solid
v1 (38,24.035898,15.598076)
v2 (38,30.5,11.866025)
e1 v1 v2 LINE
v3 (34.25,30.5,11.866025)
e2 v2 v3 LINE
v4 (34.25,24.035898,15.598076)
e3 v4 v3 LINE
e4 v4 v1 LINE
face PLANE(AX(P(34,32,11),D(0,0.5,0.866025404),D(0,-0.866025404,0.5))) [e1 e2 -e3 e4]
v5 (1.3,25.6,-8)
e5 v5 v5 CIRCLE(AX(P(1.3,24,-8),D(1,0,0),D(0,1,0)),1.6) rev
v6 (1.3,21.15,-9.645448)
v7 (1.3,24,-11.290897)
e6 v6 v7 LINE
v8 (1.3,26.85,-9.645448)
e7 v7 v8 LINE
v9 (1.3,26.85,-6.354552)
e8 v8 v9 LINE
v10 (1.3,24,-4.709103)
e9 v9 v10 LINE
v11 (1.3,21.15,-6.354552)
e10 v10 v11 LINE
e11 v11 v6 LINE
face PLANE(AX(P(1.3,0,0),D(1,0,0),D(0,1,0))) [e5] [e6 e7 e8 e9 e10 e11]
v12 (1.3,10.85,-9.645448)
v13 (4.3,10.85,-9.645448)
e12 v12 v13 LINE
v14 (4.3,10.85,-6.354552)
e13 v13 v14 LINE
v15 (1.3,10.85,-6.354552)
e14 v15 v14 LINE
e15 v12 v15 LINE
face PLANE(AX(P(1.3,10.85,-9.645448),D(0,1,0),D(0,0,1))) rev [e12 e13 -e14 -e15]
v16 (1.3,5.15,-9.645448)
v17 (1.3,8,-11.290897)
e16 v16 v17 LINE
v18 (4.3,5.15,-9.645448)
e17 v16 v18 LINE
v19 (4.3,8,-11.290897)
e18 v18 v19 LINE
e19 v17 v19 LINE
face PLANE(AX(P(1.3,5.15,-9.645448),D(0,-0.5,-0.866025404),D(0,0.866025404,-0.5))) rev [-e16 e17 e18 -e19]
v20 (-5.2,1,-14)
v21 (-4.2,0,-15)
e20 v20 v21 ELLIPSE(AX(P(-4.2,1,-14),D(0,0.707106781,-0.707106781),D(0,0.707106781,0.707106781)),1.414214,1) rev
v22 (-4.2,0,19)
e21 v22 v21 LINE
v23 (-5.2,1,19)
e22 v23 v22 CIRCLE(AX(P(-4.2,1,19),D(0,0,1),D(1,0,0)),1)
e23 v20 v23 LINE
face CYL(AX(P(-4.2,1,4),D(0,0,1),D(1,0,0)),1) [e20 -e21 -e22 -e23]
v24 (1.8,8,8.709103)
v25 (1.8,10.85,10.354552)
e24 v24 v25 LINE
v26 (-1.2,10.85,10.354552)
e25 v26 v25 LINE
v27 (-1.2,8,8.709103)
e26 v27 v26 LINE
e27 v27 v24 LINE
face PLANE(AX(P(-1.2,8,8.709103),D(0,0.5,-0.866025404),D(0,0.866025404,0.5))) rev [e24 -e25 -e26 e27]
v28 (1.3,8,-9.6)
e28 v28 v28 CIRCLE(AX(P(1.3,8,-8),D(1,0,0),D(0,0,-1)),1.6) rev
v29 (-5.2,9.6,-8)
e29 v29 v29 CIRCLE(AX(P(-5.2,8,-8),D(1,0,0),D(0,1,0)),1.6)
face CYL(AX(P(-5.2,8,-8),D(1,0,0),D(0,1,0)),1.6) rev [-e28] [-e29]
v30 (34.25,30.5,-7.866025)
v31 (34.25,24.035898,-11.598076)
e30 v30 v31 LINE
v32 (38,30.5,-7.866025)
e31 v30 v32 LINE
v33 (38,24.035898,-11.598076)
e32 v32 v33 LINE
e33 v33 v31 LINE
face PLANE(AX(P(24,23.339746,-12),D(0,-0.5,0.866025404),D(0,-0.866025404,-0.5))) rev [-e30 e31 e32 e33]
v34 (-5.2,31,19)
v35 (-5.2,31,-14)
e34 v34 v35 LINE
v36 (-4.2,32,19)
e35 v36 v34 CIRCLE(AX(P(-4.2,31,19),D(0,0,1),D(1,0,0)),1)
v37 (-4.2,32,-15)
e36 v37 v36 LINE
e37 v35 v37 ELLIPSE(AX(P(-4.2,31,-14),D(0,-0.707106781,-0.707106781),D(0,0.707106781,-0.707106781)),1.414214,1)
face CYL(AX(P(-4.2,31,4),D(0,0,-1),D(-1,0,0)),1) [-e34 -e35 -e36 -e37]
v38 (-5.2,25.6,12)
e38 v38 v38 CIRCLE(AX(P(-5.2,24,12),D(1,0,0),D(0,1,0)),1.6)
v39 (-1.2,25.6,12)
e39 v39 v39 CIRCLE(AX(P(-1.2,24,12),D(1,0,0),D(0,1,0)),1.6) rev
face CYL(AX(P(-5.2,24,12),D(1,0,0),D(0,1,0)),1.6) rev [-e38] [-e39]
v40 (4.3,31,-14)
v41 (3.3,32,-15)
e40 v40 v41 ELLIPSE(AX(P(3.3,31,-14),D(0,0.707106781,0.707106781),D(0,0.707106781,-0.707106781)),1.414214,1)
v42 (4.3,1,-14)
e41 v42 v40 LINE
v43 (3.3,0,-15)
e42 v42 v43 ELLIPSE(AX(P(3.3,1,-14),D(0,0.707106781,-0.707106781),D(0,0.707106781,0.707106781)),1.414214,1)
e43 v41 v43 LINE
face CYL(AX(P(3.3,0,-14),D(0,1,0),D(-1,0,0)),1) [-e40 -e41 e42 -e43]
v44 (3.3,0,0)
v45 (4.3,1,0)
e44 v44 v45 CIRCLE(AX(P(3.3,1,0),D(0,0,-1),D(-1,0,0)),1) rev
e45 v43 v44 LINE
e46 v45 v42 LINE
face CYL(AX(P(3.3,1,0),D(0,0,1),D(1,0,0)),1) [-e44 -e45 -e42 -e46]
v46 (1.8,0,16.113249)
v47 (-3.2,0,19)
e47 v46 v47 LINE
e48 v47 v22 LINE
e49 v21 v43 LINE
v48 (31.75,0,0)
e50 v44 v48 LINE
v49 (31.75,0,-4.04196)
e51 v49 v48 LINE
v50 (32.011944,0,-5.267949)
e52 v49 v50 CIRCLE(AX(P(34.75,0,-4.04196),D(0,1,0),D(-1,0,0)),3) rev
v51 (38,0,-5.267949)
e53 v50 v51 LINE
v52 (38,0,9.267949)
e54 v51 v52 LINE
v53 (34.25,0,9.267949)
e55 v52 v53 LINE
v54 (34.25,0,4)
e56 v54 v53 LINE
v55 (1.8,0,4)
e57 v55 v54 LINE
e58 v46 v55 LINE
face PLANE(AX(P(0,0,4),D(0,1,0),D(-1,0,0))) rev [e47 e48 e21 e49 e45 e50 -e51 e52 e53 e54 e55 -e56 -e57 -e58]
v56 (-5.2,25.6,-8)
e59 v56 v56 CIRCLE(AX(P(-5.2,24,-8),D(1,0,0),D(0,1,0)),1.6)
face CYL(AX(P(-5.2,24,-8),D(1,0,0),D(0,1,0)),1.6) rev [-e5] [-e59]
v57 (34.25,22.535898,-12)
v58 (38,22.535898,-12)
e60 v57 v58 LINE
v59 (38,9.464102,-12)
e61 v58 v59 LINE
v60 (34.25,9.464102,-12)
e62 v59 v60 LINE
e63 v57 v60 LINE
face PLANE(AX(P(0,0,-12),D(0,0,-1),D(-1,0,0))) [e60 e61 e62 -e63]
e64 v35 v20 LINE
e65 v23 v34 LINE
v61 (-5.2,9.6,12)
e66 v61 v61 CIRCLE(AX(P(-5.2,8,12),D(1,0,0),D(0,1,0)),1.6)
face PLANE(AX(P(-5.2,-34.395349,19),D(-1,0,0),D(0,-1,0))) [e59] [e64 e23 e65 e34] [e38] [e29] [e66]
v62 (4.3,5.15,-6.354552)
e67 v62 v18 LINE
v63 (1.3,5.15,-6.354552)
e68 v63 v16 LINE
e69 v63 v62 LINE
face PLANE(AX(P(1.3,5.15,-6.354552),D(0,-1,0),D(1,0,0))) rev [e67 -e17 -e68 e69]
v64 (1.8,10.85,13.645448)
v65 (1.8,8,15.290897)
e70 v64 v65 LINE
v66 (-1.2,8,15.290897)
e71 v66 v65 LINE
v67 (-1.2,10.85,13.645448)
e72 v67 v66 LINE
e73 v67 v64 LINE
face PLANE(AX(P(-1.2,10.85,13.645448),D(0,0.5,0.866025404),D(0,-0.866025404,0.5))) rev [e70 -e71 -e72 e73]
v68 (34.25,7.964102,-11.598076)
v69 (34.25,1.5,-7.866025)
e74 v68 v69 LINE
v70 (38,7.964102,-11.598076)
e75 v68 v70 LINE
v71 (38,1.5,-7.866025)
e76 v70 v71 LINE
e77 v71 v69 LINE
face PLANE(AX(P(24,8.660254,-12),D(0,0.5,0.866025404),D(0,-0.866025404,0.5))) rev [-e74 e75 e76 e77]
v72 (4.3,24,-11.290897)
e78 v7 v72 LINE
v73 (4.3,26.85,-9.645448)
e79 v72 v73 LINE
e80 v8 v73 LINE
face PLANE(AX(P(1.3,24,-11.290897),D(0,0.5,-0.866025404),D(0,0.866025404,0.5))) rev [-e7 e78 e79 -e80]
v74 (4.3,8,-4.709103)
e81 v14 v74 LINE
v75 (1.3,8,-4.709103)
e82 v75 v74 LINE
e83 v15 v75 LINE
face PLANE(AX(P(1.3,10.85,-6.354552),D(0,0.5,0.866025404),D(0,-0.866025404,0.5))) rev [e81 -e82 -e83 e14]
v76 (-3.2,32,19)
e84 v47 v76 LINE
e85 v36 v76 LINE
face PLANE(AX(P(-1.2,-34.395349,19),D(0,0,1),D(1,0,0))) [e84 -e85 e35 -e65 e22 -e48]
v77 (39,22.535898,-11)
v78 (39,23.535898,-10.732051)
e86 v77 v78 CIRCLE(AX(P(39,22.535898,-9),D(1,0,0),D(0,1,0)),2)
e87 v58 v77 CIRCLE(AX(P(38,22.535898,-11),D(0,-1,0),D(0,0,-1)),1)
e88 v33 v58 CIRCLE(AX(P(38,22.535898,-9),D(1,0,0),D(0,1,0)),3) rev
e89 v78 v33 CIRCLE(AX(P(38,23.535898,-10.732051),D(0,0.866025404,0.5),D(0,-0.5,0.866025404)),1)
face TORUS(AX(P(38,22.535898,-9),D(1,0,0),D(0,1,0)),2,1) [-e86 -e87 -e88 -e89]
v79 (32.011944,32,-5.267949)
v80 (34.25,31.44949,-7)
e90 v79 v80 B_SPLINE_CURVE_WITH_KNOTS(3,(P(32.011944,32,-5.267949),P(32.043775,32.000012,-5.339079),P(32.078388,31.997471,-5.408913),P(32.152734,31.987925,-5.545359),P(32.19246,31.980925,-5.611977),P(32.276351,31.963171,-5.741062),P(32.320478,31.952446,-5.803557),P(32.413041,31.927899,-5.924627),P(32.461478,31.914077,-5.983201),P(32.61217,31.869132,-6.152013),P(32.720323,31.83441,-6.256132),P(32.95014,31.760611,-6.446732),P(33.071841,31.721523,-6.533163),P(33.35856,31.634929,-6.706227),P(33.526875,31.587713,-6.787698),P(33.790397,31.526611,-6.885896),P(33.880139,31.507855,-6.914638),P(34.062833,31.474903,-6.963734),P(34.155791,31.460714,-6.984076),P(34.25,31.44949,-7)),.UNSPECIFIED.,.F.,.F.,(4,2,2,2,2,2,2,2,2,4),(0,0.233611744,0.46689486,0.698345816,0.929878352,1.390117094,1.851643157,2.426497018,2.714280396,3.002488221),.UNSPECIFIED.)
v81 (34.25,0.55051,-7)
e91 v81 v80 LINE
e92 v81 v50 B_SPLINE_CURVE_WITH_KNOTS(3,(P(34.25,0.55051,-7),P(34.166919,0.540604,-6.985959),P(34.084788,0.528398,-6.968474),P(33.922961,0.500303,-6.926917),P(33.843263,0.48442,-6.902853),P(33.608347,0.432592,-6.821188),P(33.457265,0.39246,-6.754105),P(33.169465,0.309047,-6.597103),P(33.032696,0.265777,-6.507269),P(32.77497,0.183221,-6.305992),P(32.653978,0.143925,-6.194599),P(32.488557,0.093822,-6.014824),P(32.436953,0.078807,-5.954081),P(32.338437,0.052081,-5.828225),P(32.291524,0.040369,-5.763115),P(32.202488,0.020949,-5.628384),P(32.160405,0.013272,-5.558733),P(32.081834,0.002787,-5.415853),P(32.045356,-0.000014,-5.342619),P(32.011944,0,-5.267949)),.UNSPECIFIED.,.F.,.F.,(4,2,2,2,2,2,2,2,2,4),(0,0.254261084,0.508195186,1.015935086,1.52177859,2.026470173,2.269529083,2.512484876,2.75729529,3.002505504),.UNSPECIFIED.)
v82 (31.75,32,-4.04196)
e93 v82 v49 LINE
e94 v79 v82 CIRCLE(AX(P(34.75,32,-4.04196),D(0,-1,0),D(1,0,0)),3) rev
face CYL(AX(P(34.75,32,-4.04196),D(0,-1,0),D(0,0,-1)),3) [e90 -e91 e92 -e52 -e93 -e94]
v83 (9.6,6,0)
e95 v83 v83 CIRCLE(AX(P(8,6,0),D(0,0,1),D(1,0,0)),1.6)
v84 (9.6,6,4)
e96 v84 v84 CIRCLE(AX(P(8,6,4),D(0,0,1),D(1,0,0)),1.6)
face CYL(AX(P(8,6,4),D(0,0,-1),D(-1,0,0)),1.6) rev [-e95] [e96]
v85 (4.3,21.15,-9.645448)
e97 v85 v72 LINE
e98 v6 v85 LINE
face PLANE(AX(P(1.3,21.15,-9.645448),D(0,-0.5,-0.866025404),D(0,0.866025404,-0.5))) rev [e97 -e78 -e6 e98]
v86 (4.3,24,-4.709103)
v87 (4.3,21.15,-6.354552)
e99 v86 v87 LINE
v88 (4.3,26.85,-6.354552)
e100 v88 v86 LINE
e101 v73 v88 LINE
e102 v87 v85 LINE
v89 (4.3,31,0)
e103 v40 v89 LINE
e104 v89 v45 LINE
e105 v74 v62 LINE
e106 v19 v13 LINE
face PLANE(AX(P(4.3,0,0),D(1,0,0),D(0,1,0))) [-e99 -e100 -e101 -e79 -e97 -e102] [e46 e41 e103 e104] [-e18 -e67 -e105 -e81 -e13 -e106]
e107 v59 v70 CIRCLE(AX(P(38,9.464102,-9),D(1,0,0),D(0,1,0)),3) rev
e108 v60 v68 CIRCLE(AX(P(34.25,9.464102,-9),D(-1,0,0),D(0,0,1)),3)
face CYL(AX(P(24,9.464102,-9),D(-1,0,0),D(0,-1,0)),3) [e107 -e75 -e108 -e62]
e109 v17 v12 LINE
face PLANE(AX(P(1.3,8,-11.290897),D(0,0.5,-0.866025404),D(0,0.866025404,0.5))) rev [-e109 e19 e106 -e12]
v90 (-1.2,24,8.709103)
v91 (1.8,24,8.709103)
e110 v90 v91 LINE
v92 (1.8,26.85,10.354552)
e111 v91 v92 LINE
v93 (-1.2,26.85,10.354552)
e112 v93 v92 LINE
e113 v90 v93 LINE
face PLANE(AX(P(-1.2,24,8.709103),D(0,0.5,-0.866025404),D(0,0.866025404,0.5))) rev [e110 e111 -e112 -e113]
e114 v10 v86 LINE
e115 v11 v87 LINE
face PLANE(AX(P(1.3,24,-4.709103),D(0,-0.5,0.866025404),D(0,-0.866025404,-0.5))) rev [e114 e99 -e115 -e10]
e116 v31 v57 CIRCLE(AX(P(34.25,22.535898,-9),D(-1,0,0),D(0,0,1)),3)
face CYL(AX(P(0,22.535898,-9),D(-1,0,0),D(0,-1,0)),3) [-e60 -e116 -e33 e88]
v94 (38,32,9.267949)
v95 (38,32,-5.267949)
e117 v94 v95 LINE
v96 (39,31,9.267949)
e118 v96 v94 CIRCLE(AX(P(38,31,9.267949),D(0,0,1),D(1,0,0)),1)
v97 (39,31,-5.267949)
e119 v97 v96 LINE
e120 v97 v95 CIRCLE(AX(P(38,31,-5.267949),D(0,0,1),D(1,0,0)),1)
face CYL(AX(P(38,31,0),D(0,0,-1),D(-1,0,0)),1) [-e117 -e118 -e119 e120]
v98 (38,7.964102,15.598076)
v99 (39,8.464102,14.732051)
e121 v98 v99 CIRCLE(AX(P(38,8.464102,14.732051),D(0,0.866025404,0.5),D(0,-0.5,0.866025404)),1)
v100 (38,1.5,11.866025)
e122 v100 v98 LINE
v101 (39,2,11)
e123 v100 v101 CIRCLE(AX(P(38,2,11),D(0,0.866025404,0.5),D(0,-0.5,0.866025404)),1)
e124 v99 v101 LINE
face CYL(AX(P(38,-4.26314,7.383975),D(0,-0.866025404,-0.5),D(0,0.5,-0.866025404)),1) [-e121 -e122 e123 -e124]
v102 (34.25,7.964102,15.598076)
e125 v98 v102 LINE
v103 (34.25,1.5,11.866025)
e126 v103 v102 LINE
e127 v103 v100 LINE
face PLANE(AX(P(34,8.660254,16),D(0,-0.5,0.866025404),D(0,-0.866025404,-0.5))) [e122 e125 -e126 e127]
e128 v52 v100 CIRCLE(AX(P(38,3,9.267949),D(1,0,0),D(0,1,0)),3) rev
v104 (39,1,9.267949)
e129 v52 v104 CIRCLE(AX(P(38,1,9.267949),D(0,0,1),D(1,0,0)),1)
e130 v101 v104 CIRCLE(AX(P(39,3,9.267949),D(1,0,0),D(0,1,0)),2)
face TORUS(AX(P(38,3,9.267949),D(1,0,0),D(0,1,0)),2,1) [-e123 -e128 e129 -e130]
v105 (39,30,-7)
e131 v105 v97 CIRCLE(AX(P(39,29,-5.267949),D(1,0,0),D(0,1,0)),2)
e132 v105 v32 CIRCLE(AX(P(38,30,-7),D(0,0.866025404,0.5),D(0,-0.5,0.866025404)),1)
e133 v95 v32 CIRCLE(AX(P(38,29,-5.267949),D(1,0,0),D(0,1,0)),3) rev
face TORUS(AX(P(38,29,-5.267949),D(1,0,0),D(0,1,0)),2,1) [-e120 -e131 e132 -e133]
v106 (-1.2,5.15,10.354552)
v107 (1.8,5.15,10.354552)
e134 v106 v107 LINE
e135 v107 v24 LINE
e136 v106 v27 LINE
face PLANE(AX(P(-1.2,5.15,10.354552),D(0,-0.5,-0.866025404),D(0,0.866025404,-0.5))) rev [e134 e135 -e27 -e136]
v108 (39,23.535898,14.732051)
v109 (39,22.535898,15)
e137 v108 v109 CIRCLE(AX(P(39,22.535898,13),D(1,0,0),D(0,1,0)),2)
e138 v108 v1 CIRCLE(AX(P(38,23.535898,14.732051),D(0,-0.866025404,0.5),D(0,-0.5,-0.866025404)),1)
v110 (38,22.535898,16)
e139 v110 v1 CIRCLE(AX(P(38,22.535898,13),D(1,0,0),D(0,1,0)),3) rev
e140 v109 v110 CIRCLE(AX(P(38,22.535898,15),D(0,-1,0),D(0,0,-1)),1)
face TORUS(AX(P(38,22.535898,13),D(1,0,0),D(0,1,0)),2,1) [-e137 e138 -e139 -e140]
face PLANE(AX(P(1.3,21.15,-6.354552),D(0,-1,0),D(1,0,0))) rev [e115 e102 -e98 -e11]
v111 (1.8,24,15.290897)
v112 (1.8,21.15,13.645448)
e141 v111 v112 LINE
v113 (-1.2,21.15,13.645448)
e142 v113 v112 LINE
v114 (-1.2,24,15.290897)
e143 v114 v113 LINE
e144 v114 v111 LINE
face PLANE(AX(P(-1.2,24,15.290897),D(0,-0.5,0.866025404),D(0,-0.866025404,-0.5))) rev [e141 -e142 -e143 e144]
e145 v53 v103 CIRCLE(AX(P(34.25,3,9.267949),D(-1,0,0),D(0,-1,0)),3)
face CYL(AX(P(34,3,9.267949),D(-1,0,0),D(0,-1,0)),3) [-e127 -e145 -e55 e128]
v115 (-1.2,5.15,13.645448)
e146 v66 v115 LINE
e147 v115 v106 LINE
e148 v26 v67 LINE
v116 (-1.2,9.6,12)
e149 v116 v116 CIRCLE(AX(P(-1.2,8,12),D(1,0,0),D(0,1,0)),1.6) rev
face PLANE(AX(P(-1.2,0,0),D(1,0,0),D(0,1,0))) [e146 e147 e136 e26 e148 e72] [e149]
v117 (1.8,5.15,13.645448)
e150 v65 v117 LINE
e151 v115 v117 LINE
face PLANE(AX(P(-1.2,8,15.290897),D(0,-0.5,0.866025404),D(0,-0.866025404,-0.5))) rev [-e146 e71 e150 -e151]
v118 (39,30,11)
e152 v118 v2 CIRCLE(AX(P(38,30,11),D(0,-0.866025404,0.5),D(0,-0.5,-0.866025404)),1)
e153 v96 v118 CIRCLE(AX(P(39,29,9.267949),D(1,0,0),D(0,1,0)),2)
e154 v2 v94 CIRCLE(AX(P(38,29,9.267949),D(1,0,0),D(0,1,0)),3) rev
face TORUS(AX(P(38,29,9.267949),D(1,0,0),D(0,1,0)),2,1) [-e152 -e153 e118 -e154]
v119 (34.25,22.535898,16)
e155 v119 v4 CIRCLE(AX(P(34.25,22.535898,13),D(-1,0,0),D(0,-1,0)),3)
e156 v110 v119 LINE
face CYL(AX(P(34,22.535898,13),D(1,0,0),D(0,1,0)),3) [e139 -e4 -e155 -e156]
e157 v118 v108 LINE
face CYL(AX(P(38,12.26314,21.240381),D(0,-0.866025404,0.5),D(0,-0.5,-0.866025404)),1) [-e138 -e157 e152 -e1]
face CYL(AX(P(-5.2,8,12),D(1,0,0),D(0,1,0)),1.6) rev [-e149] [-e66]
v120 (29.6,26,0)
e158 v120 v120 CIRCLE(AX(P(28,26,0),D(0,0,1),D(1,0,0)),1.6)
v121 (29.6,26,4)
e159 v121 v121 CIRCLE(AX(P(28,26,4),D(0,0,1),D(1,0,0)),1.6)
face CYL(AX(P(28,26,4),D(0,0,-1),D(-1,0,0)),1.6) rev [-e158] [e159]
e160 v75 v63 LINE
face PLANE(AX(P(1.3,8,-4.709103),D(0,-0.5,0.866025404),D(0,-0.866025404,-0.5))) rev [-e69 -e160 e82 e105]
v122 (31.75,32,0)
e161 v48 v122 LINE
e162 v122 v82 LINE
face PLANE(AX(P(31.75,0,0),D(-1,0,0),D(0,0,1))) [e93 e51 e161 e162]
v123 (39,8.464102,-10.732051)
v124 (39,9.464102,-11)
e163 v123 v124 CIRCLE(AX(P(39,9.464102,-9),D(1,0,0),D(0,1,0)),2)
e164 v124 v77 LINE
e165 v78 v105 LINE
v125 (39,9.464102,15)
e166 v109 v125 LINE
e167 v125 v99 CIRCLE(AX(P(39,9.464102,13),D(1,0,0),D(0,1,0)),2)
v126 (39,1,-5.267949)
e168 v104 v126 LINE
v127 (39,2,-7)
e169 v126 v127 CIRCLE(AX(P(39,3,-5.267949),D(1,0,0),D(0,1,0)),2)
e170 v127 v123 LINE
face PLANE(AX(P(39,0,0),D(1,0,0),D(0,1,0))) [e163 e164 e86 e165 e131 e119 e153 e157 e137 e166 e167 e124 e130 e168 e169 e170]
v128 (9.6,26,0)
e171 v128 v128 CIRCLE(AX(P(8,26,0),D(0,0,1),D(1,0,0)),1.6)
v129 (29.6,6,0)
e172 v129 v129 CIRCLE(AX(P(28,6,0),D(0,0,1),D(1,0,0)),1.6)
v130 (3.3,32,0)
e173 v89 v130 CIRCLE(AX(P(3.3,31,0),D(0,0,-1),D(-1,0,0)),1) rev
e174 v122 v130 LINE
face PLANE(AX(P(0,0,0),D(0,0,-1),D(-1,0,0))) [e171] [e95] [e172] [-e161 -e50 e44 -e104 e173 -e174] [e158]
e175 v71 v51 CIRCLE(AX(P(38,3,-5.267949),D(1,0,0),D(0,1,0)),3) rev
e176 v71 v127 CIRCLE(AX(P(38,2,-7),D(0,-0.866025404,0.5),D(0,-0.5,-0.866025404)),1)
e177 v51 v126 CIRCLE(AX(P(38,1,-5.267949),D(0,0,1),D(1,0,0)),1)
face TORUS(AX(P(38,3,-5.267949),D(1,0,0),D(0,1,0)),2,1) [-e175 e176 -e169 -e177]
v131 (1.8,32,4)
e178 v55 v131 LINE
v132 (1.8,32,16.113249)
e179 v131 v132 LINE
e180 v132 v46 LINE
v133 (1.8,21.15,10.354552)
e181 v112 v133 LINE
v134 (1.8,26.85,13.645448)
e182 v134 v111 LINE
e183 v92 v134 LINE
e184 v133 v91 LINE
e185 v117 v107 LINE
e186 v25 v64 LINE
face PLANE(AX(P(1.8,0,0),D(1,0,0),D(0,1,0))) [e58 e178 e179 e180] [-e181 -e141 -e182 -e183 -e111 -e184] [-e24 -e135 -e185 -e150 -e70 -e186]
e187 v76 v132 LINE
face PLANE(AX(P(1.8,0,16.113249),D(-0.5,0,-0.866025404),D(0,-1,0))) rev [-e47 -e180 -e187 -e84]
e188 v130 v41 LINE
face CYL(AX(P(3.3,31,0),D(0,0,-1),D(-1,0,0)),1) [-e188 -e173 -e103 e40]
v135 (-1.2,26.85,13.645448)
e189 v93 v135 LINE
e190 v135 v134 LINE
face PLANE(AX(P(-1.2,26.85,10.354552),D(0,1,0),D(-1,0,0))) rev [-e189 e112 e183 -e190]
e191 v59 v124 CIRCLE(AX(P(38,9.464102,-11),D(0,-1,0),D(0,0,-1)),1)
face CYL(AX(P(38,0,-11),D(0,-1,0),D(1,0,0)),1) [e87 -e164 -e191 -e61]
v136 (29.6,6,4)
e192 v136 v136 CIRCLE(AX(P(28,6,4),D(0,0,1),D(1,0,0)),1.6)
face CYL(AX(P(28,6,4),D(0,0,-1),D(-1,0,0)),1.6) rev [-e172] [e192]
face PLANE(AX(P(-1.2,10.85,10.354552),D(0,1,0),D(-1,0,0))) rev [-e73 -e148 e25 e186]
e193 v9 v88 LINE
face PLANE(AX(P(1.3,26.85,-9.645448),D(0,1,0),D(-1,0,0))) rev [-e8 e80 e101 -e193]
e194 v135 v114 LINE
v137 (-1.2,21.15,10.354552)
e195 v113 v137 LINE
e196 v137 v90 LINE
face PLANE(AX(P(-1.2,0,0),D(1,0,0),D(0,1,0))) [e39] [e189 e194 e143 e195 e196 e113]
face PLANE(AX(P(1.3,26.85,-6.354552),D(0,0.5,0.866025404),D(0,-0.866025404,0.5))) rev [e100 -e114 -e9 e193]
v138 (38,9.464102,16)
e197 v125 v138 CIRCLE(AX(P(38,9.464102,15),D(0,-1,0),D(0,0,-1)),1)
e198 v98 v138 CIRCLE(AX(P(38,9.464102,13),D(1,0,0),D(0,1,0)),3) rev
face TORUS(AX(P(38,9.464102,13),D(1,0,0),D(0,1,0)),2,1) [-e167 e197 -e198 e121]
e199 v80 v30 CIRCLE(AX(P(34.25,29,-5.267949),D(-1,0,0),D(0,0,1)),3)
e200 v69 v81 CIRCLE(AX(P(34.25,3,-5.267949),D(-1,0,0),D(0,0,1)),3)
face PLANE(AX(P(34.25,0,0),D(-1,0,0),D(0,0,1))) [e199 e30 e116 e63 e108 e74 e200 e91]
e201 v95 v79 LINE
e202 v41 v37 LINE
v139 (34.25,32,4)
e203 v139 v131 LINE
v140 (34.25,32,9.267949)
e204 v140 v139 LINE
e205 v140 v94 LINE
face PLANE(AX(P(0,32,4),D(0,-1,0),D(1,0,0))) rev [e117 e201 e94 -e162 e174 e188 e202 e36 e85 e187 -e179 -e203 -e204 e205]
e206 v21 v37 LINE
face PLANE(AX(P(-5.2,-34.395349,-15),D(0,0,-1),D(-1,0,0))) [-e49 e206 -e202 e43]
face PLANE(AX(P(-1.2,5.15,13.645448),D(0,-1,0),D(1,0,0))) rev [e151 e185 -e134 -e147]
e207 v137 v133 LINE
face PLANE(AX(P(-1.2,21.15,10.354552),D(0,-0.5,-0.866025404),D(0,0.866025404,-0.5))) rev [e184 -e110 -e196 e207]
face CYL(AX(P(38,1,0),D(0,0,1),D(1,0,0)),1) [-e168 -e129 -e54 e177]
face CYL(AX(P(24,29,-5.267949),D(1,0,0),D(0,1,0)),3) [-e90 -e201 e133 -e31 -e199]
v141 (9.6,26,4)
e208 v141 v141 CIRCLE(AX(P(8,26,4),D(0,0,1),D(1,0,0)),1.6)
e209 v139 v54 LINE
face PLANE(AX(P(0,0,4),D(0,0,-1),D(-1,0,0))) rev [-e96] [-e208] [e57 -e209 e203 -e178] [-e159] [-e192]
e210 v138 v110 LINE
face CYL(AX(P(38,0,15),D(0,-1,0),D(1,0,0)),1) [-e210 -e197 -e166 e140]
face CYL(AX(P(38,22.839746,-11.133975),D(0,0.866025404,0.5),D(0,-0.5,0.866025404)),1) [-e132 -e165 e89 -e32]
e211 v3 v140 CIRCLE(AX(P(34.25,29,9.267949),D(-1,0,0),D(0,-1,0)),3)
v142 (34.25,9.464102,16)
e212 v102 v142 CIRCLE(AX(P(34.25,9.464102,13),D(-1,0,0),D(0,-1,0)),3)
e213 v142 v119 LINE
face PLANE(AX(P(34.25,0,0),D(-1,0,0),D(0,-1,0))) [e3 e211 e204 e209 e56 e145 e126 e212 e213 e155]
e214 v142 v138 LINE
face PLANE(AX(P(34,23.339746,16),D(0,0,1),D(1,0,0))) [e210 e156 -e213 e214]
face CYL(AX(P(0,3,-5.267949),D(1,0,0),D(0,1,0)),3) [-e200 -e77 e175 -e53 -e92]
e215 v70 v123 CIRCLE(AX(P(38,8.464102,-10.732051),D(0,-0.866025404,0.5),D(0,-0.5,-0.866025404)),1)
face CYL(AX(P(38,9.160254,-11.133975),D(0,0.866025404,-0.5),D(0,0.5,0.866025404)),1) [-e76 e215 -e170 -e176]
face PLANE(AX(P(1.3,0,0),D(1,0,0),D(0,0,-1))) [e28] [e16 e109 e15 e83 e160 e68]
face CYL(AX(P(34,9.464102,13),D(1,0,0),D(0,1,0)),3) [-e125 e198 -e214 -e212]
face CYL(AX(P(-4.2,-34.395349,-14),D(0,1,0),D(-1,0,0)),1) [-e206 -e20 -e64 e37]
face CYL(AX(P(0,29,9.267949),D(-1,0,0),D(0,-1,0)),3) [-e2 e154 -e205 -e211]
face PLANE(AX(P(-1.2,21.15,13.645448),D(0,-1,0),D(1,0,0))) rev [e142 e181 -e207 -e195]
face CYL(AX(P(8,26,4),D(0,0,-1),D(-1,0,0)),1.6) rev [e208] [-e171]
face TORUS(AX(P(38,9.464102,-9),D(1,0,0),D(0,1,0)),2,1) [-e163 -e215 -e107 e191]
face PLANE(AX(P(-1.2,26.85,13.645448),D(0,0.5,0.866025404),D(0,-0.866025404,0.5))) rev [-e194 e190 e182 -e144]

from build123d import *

# Parameters (mm, degrees)
SKETCH_1_W          = 36
SKETCH_1_H          = 32
SKETCH_1_R          = 1.6
EXTRUDE_1_DEPTH     = 4
EXTRUDE_2_DEPTH     = 32
SKETCH_8_R          = 1.6
CUT_EXTRUDE_1_DEPTH = 53.619768148
SKETCH1_W           = 4
SKETCH1_H           = 32
BOSS_EXTRUDE1_DEPTH = 3
SKETCH2_W           = 5
SKETCH2_H           = 32
BOSS_EXTRUDE2_DEPTH = 12
CUT_EXTRUDE1_DEPTH  = 5
BOSS_EXTRUDE5_DEPTH = 5
BOSS_EXTRUDE6_START = 3
SKETCH7_W           = 15
SKETCH7_H           = 32
SKETCH7_R           = 1.6
BOSS_EXTRUDE6_DEPTH = 3
CUT_EXTRUDE2_DEPTH  = 0.25
BOSS_EXTRUDE7_START = 2.5
SKETCH9_W           = 15
SKETCH9_H           = 32
SKETCH9_R           = 1.6
BOSS_EXTRUDE7_DEPTH = 2.5
BOSS_EXTRUDE8_DEPTH = 2.5
CUT_EXTRUDE3_DEPTH  = 2.5
FILLET2_R           = 3
FILLET4_R           = 3
FILLET5_R           = 3
FILLET9_R           = 1
CUT_EXTRUDE4_DEPTH  = 3
CUT_EXTRUDE5_DEPTH  = 3
FILLET14_R          = 1
CHAMFER_1_SIZE      = 5
CHAMFER_1_SIZE2     = 2.886751346


with BuildPart() as part:
    # Эскиз1 → Бобышка-Вытянуть1 (new body)
    with BuildSketch(Plane.XY):
        with Locations((18, 16)):
            Rectangle(SKETCH_1_W, SKETCH_1_H)
        with Locations((8, 26)):
            Circle(SKETCH_1_R, mode=Mode.SUBTRACT)
        with Locations((28, 26)):
            Circle(SKETCH_1_R, mode=Mode.SUBTRACT)
        with Locations((8, 6)):
            Circle(SKETCH_1_R, mode=Mode.SUBTRACT)
        with Locations((28, 6)):
            Circle(SKETCH_1_R, mode=Mode.SUBTRACT)
    extrude(amount=EXTRUDE_1_DEPTH)

    # Эскиз7 → Бобышка-Вытянуть2 (add)
    with BuildSketch(Plane(origin=(0, 32, 0), x_dir=(1, 0, 0), z_dir=(0, 1, 0))):
        Polygon((0, 0), (-1.2, 0), (-1.2, 15), (-5.2, 15), (-5.2, -19), (-1.2, -19), (-1.2, -4), (0, -4), align=None)
    extrude(amount=-EXTRUDE_2_DEPTH)

    # Эскиз8 → Вырез-Вытянуть1 (cut, through all)
    with BuildSketch(Plane(origin=(-1.2, 0, 0), x_dir=(0, 0, -1), z_dir=(1, 0, 0))):
        with Locations(Location((8, 24, 0), (0, 0, 90))):
            Circle(SKETCH_8_R)
        with Locations(Location((8, 8, 0), (0, 0, 90))):
            Circle(SKETCH_8_R)
        with Locations(Location((-12, 8, 0), (0, 0, 90))):
            Circle(SKETCH_8_R)
        with Locations(Location((-12, 24, 0), (0, 0, 90))):
            Circle(SKETCH_8_R)
    extrude(amount=-CUT_EXTRUDE_1_DEPTH, mode=Mode.SUBTRACT)

    # Sketch1 → Boss-Extrude1 (add)
    with BuildSketch(Plane(origin=(36, 0, 0), x_dir=(0, 0, -1), z_dir=(1, 0, 0))):
        with Locations((-2, 16)):
            Rectangle(SKETCH1_W, SKETCH1_H)
    extrude(amount=BOSS_EXTRUDE1_DEPTH)

    # Sketch2 → Boss-Extrude2 (add)
    with BuildSketch(Plane(origin=(0, 0, 0), x_dir=(-1, 0, 0), z_dir=(0, 0, -1))):
        with Locations((-36.5, 16)):
            Rectangle(SKETCH2_W, SKETCH2_H)
    extrude(amount=BOSS_EXTRUDE2_DEPTH)

    # Sketch3 → Cut-Extrude1 (cut)
    with BuildSketch(Plane(origin=(39, 0, 0), x_dir=(0, 0, -1), z_dir=(1, 0, 0))):
        Polygon((7, 32), (12, 32), (12, 23.339745962), align=None)
        Polygon((12, 8.660254038), (7, 0), (12, 0), align=None)
    extrude(amount=-CUT_EXTRUDE1_DEPTH, mode=Mode.SUBTRACT)

    # Sketch6 → Boss-Extrude5 (add)
    with BuildSketch(Plane(origin=(39, 0, 0), x_dir=(0, 0, -1), z_dir=(1, 0, 0))):
        Polygon((-16, 8.660254038), (-11, 0), (-4, 0), (-4, 32), (-11, 32), (-16, 23.339745962), align=None)
    extrude(amount=-BOSS_EXTRUDE5_DEPTH)

    # Sketch7 → Boss-Extrude6 (add)
    # profile 1 of 2: a face of its own
    with BuildSketch(Plane(origin=(-1.2, 0, 0), x_dir=(0, 0, -1), z_dir=(1, 0, 0)).offset(BOSS_EXTRUDE6_START)):
        with Locations((7.5, 16)):
            Rectangle(SKETCH7_W, SKETCH7_H)
        with Locations(Location((8, 24, 0), (0, 0, 90))):
            Circle(SKETCH7_R, mode=Mode.SUBTRACT)
        with Locations(Location((8, 8, 0), (0, 0, 90))):
            Circle(SKETCH7_R, mode=Mode.SUBTRACT)
    # profile 2 of 2: a face of its own
    with BuildSketch(Plane(origin=(-1.2, 0, 0), x_dir=(0, 0, -1), z_dir=(1, 0, 0)).offset(BOSS_EXTRUDE6_START)):
        with Locations((-11.5, 16)):
            Rectangle(SKETCH7_W, SKETCH7_H)
        with Locations(Location((-12, 24, 0), (0, 0, 90))):
            Circle(SKETCH7_R, mode=Mode.SUBTRACT)
        with Locations(Location((-12, 8, 0), (0, 0, 90))):
            Circle(SKETCH7_R, mode=Mode.SUBTRACT)
    extrude(amount=-BOSS_EXTRUDE6_DEPTH)

    # Sketch8 → Cut-Extrude2 (cut)
    with BuildSketch(Plane.ZY.offset(-34)):
        Polygon((-12, 23.339745962), (-12, 8.660254038), (-7, 0), (0, 0), (0, 32), (-7, 32), align=None)
        Polygon((4, 32), (4, 0), (11, 0), (16, 8.660254038), (16, 23.339745962), (11, 32), align=None)
    extrude(amount=-CUT_EXTRUDE2_DEPTH, mode=Mode.SUBTRACT)

    # Sketch9 → Boss-Extrude7 (add)
    with BuildSketch(Plane(origin=(1.8, 0, 0), x_dir=(0, 0, -1), z_dir=(1, 0, 0)).offset(BOSS_EXTRUDE7_START)):
        with Locations((7.5, 16)):
            Rectangle(SKETCH9_W, SKETCH9_H)
        with Locations(Location((8, 24, 0), (0, 0, 90))):
            Circle(SKETCH9_R, mode=Mode.SUBTRACT)
        with Locations(Location((8, 8, 0), (0, 0, 90))):
            Circle(SKETCH9_R, mode=Mode.SUBTRACT)
    extrude(amount=-BOSS_EXTRUDE7_DEPTH)

    # Sketch10 → Boss-Extrude8 (add)
    with BuildSketch(Plane.ZY.offset(-34.25)):
        Polygon((-7, 32), (-12, 23.339745962), (-12, 8.660254038), (-7, 0), (0, 0), (0, 32), align=None)
    extrude(amount=BOSS_EXTRUDE8_DEPTH)

    # Sketch11 → Cut-Extrude3 (cut)
    with BuildSketch(Plane.ZY.offset(-31.75)):
        Polygon((-7, 32), (-12, 23.339745962), (-12, 8.660254038), (-7, 0), align=None)
    extrude(amount=-CUT_EXTRUDE3_DEPTH, mode=Mode.SUBTRACT)

    # Fillet2
    # the kernel refuses this fillet: 3 mm, written as the material it takes off along each edge
    with BuildSketch(Plane(origin=(31.75, -7.395099729, -7), x_dir=(1, 0, 0), z_dir=(0, 1, 0))) as fillet2_piece_1:
        with BuildLine():
            CenterArc((3, -2.958039892), FILLET2_R, 99.594068227, 80.405931773)
            Line((0, -2.958039892), (-0.06, -2.958039892))
            Line((-0.06, -2.958039892), (-0.06, 0))
            Line((-0.06, 0), (0, 0.06))
            ThreePointArc((0, 0.06), (1.25, 0.06), (2.49, 0.059160798))
            Line((2.49, 0.059160798), (2.5, 0))
        make_face()
    extrude(amount=46.790199458, mode=Mode.SUBTRACT)

    # Fillet4
    fillet4_edges = [part.edges().sort_by_distance(p)[0] for p in [
        (36.625, 32, -7),
        (36.625, 0, -7),
        (36.625, 8.660254038, -12),
        (36.625, 23.339745962, -12),
    ]]
    fillet(fillet4_edges, radius=FILLET4_R)

    # Fillet5
    fillet5_edges = [part.edges().sort_by_distance(p)[0] for p in [
        (36.625, 32, 11),
        (36.625, 23.339745962, 16),
        (36.625, 8.660254038, 16),
        (36.625, 0, 11),
    ]]
    fillet(fillet5_edges, radius=FILLET5_R)

    # Fillet9
    fillet9_edges = [part.edges().sort_by_distance(p)[0] for p in [
        (39, 4.732050808, -9.732050808),
        (39, 16, -12),
        (39, 27.267949192, -9.732050808),
        (39, 32, 2),
        (39, 31.598076211, -6.767949192),
        (39, 23.31235552, -11.897777479),
        (39, 8.68764448, -11.897777479),
        (39, 0.401923789, -6.767949192),
        (39, 4.732050808, 13.732050808),
        (39, 0, 2),
        (39, 27.267949192, 13.732050808),
        (39, 16, 16),
        (39, 31.598076211, 10.767949192),
        (39, 23.31235552, 15.897777479),
        (39, 8.68764448, 15.897777479),
        (39, 0.401923789, 10.767949192),
    ]]
    fillet(fillet9_edges, radius=FILLET9_R)

    # Sketch12 → Cut-Extrude4 (cut)
    with BuildSketch(Plane(origin=(4.3, 0, 0), x_dir=(0, 0, -1), z_dir=(1, 0, 0))):
        Polygon((6.354551733, 26.85), (4.709103466, 24), (6.354551733, 21.15), (9.645448267, 21.15), (11.290896534, 24), (9.645448267, 26.85), align=None)
        Polygon((6.354551733, 10.85), (4.709103466, 8), (6.354551733, 5.15), (9.645448267, 5.15), (11.290896534, 8), (9.645448267, 10.85), align=None)
    extrude(amount=-CUT_EXTRUDE4_DEPTH, mode=Mode.SUBTRACT)

    # Sketch13 → Cut-Extrude5 (cut)
    with BuildSketch(Plane(origin=(1.8, 0, 0), x_dir=(0, 0, -1), z_dir=(1, 0, 0))):
        Polygon((-15.290896534, 24), (-13.645448267, 21.15), (-10.354551733, 21.15), (-8.709103466, 24), (-10.354551733, 26.85), (-13.645448267, 26.85), align=None)
        Polygon((-15.290896534, 8), (-13.645448267, 5.15), (-10.354551733, 5.15), (-8.709103466, 8), (-10.354551733, 10.85), (-13.645448267, 10.85), align=None)
    extrude(amount=-CUT_EXTRUDE5_DEPTH, mode=Mode.SUBTRACT)

    # Fillet14
    fillet14_edges = [part.edges().sort_by_distance(p)[0] for p in [
        (4.3, 32, -7.5),
        (4.3, 0, -7.5),
        (4.3, 16, -15),
        (-5.2, 16, -15),
        (-5.2, 32, 2),
        (-5.2, 0, 2),
    ]]
    fillet(fillet14_edges, radius=FILLET14_R)

    # Фаска1
    chamfer_1_edges = [part.edges().sort_by_distance(p)[0] for p in [
        (1.8, 16, 19),
    ]]
    chamfer_1_side = [part.faces().sort_by_distance(p)[0] for p in [
        (-1.693709632, 16, 19),
    ]]
    chamfer(chamfer_1_edges, length=CHAMFER_1_SIZE, length2=CHAMFER_1_SIZE2, reference=chamfer_1_side[0])


solid = part.part
